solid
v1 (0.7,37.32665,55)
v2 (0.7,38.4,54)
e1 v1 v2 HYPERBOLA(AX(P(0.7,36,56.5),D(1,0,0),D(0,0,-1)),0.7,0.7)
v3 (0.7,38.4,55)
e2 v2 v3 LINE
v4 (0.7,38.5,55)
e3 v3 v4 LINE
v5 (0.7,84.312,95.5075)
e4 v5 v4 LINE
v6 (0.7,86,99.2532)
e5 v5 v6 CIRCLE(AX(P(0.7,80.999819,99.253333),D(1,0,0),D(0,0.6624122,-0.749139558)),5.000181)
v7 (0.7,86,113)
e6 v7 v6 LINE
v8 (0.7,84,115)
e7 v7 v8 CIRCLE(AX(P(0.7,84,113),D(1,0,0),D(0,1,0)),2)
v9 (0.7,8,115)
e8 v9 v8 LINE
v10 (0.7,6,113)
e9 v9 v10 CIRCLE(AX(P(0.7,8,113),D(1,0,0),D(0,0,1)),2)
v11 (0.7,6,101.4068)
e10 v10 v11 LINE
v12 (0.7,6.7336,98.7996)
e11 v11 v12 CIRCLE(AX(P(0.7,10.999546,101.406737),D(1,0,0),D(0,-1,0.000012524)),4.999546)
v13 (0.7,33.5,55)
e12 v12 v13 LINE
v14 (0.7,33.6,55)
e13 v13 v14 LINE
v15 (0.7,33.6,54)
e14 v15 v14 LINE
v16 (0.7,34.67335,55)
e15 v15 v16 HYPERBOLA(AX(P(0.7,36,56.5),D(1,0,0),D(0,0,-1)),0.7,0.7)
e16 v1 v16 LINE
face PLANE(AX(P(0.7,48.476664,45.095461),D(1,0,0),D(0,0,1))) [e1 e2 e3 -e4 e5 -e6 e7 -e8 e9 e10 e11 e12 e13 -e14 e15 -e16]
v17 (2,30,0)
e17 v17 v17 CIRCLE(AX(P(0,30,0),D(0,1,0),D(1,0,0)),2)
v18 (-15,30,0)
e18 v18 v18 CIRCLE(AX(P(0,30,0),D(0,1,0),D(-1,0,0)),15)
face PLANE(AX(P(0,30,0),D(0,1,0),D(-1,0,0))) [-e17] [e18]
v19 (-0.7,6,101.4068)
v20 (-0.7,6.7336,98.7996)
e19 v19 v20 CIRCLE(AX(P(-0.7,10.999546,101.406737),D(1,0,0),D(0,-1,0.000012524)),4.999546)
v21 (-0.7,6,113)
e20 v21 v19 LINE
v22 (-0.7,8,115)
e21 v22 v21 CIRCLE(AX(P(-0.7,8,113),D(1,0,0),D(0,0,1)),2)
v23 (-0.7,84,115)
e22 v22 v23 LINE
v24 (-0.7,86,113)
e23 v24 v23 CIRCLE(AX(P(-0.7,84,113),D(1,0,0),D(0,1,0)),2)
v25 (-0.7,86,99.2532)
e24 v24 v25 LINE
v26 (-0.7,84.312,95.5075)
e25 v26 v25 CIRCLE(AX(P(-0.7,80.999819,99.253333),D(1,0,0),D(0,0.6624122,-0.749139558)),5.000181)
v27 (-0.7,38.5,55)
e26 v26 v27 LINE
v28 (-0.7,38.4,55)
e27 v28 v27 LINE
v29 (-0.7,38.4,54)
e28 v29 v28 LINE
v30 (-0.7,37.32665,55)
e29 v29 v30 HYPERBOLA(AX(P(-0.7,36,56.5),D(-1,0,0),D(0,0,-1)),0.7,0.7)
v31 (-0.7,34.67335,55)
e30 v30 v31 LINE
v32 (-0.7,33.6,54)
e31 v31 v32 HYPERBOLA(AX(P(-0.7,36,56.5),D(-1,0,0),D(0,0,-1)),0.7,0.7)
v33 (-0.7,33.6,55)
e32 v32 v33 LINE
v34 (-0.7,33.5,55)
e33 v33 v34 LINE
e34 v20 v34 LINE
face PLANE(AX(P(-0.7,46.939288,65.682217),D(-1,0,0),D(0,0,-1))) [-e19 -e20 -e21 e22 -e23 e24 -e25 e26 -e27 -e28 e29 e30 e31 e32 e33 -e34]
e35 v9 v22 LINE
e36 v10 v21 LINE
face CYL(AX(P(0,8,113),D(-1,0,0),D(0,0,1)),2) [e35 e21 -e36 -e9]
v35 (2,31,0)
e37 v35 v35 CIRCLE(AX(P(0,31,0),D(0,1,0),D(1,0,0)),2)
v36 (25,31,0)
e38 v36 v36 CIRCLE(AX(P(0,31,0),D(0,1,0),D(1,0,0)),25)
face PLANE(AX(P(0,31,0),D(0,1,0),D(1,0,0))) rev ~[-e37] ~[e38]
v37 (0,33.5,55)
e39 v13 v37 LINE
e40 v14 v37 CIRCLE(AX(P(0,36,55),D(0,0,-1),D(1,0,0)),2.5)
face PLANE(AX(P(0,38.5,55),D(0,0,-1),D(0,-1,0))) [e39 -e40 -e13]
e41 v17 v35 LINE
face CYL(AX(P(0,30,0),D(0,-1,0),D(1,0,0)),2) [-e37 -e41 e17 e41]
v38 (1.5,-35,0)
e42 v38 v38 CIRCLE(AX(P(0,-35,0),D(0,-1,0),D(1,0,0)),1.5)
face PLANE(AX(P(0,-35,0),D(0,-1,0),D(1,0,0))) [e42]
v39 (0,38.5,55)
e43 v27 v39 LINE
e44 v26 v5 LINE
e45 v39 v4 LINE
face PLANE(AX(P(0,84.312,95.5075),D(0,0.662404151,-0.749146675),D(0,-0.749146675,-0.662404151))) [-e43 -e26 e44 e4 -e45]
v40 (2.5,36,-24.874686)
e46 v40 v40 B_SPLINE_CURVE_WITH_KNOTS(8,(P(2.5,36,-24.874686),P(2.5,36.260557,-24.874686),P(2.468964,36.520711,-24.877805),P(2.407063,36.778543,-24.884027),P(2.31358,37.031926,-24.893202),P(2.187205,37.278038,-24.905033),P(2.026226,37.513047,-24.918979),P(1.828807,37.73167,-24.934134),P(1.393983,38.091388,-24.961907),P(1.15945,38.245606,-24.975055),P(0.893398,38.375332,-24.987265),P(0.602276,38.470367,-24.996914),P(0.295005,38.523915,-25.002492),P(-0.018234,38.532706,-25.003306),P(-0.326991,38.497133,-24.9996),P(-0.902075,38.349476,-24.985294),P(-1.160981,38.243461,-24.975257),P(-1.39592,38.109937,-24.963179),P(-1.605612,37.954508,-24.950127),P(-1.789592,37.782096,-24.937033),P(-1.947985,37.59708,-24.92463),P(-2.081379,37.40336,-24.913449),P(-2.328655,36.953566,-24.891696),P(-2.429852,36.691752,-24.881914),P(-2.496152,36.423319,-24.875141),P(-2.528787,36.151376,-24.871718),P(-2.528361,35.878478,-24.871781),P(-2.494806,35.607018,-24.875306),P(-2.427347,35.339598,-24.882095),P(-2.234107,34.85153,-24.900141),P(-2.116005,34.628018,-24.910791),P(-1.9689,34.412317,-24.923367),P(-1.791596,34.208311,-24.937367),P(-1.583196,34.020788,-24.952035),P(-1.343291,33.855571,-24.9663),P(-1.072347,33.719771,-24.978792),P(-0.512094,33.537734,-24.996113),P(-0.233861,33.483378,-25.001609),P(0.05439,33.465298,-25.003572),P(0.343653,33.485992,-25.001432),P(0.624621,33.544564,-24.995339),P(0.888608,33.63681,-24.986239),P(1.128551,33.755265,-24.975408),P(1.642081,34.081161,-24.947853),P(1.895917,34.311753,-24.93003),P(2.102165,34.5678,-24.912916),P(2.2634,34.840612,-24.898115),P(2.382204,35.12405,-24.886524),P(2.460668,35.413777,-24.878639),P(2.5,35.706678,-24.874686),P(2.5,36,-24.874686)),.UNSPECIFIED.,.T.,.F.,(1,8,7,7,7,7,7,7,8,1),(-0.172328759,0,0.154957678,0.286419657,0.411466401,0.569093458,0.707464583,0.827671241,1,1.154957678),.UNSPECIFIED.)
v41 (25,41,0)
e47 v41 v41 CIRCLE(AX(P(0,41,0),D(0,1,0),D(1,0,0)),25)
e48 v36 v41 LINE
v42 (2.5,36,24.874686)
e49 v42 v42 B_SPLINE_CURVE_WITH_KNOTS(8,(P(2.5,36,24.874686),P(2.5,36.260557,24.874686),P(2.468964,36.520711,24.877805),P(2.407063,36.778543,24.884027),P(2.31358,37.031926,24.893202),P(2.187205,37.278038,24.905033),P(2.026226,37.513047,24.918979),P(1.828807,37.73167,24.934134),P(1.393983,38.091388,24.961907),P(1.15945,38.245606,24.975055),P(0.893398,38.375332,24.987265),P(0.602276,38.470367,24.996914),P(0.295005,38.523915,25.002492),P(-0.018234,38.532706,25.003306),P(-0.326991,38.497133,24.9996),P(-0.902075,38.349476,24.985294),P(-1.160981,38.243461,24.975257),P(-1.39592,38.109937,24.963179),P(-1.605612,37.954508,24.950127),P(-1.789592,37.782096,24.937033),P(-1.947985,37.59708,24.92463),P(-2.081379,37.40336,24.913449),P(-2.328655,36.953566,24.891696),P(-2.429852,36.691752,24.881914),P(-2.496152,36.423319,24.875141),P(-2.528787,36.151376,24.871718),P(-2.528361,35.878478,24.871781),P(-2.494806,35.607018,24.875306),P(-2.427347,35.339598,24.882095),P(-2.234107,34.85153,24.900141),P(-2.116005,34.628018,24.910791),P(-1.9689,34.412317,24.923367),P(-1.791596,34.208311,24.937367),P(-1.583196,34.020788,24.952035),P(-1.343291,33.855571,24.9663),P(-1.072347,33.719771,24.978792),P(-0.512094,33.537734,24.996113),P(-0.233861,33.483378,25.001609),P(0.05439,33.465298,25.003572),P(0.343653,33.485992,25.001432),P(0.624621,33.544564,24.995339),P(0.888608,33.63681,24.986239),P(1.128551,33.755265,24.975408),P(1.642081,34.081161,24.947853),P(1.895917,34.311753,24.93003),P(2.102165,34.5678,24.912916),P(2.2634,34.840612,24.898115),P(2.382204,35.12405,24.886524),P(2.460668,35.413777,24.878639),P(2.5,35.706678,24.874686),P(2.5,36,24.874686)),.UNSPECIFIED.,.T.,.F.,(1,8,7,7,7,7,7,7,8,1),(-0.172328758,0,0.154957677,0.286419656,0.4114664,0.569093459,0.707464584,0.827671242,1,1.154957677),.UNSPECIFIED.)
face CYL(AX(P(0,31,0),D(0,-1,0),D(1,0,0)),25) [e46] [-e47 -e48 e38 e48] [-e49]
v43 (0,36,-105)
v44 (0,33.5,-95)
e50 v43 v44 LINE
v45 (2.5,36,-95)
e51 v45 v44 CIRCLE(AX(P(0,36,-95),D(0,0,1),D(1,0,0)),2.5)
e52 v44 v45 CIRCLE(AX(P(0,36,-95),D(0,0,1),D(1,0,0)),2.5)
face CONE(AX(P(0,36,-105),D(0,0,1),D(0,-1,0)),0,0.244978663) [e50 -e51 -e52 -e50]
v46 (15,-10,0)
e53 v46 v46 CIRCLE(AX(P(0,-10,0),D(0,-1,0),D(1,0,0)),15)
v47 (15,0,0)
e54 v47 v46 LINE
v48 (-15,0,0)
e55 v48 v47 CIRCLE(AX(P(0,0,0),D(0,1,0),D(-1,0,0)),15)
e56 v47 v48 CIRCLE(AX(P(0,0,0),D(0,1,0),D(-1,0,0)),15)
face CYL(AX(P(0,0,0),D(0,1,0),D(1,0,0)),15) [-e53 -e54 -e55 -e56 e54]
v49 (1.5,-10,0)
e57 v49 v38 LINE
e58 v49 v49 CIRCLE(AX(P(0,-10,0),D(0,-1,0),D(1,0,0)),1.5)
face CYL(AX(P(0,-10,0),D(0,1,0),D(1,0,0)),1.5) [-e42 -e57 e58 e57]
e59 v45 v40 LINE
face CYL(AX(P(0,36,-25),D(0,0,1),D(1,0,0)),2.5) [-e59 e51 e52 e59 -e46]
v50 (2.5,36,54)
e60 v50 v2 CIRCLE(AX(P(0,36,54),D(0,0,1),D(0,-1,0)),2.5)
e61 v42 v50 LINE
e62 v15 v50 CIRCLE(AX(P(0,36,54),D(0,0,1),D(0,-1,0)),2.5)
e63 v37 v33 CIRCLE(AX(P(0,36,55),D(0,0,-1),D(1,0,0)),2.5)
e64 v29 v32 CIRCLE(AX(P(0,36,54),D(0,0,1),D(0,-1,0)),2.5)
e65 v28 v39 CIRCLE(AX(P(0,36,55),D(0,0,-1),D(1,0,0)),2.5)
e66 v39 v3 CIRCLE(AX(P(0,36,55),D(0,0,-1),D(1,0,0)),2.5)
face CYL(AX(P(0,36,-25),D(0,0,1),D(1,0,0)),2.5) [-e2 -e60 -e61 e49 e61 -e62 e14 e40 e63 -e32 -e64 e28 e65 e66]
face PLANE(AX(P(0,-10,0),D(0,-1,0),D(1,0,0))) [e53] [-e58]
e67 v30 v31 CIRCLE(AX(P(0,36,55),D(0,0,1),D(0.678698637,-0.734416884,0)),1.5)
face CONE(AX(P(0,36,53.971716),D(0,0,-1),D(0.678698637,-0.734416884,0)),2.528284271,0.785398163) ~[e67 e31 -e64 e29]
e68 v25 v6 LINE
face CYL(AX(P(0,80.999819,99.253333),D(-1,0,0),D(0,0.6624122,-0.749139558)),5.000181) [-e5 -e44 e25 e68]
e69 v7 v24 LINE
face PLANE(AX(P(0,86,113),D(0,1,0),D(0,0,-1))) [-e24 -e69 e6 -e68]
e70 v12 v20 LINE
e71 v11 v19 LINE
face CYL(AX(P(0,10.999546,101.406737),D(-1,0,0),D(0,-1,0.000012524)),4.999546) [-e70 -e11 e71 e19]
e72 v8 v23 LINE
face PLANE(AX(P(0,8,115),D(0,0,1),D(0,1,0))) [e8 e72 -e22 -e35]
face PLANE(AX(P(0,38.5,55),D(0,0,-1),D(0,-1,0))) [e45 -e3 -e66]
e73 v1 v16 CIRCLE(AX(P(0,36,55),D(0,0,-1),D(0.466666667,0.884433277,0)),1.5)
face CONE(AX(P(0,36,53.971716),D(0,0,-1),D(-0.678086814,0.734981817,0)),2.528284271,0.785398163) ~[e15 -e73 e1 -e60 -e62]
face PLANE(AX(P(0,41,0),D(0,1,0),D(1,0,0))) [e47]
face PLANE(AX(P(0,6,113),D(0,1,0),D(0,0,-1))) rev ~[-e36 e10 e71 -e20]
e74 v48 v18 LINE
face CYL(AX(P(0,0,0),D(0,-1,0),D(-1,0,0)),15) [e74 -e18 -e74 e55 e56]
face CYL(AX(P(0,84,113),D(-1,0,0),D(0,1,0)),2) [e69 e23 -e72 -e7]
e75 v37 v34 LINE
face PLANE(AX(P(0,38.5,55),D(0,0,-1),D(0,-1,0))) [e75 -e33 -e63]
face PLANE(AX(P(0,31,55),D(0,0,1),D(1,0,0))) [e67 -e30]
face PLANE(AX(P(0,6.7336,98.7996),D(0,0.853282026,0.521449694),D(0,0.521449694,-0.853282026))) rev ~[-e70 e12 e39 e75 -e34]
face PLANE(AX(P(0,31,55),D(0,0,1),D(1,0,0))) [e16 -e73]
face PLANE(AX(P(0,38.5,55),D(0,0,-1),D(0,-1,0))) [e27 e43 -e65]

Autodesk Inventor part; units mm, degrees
ref_plane "YZ Plane" through (0, 0, 0) normal (1, 0, 0) x (0, 1, 0)
ref_plane "XZ Plane" through (0, 0, 0) normal (0, 1, 0) x (-1, 0, 0)
sketch "Esboço1" plane through (0, 0, 0) normal (0, 1, 0) x (-1, 0, 0)
  circle A0 centre (0, 0) radius 15
  dimension "d0" = 30
extrude "Extrusão1" add sketch "Esboço1" along normal blind 30
sketch "Esboço2" plane through (0, 30, 0) normal (0, 1, 0) x (1, 0, 0)
  circle A0 centre (0, 0) radius 2
  dimension "d3" = 4
extrude "Extrusão2" add sketch "Esboço2" along normal blind 1
sketch "Esboço3" plane through (0, 31, 0) normal (0, 1, 0) x (1, 0, 0)
  circle A0 centre (0, 0) radius 25
  dimension "d6" = 50
extrude "Extrusão3" add sketch "Esboço3" along normal blind 10
ref_plane "Plano de trabalho1" through (0, 31, -25) normal (0, 0, 1) x (1, 0, 0)
sketch "Esboço4" plane through (0, 31, -25) normal (0, 0, 1) x (1, 0, 0)
  line L0 (2, 0) -> (-2, 0) projected
  line L1 (0, 0) -> (0, 10)
  line L2 (25, 10) -> (-25, 10) projected
  circle A0 centre (0, 5) radius 2.5
  point P0 (0, -31)
  dimension "d9" = 5
extrude "Extrusão4" add sketch "Esboço4" along normal blind 80 and the other way blind 70
sketch "Esboço5" plane through (0, 0, 0) normal (1, 0, 0) x (0, 1, 0)
  line L0 (33.5, -95) -> (38.5, -95) projected
  line L1 (36, -95) -> (36, -105)
  line L2 (36, -95) -> (46, -95) construction
  line L3 (36, -105) -> (33.5, -95)
  line L4 (36, -95) -> (33.5, -95)
  point P0 (0, 0)
  dimension "d14" = 10
  dimension "d15" = 90
revolve "Revolução1" add sketch "Esboço5" angle 360 about axis through (0, 36, -95) along (0, 0, -1)
sketch "Esboço6" plane through (0, 0, 0) normal (1, 0, 0) x (0, 1, 0)
  line L0 (38.5, 55) -> (33.5, 55) projected
  line L1 (33.5, 25) -> (33.5, 55) projected
  line L2 (38.5, 25) -> (38.5, 55) projected
  line L3 (33.5, 55) -> (38.5, 55)
  line L4 (6, 113) -> (6, 101.4068)
  line L5 (6.7336, 98.7996) -> (33.5, 55)
  line L6 (8, 115) -> (84, 115)
  line L7 (86, 113) -> (86, 99.2532)
  line L8 (84.312, 95.5075) -> (38.5, 55)
  arc A0 (84.312, 95.5075) -> (86, 99.2532) centre (81, 99.2532) ccw
  arc A1 (6, 101.4068) -> (6.7336, 98.7996) centre (11, 101.4068) ccw
  arc A2 (8, 115) -> (6, 113) centre (8, 113) ccw
  arc A3 (86, 113) -> (84, 115) centre (84, 113) ccw
  point P0 (0, 0)
  point P1 (6, 115)
  point P2 (86, 115)
  point P3 (86, 97)
  dimension "d27" = 80
  dimension "d28" = 18
  dimension "d29" = 5
  dimension "d30" = 2
extrude "Extrusão5" add sketch "Esboço6" along normal mid plane 1.4
chamfer "Chanfro1" distance 1 angle 45 2 edges at (2, 34.5, 55) (-2.5, 36, 55)
sketch "Esboço7" plane through (0, 0, 0) normal (0, -1, 0) x (1, 0, 0)
  circle A0 centre (0, 0) radius 15
extrude "Extrusão6" add sketch "Esboço7" along normal blind 10
sketch "Esboço8" plane through (0, -10, 0) normal (0, -1, 0) x (1, 0, 0)
  circle A0 centre (0, 0) radius 1.5
  dimension "d39" = 3
extrude "Extrusão7" add sketch "Esboço8" along normal blind 25
thread "Rosca1" size "M3x0.5" class "6g" standard "ANSI Metric M Profile" full length
properties part number "wind_vane"
